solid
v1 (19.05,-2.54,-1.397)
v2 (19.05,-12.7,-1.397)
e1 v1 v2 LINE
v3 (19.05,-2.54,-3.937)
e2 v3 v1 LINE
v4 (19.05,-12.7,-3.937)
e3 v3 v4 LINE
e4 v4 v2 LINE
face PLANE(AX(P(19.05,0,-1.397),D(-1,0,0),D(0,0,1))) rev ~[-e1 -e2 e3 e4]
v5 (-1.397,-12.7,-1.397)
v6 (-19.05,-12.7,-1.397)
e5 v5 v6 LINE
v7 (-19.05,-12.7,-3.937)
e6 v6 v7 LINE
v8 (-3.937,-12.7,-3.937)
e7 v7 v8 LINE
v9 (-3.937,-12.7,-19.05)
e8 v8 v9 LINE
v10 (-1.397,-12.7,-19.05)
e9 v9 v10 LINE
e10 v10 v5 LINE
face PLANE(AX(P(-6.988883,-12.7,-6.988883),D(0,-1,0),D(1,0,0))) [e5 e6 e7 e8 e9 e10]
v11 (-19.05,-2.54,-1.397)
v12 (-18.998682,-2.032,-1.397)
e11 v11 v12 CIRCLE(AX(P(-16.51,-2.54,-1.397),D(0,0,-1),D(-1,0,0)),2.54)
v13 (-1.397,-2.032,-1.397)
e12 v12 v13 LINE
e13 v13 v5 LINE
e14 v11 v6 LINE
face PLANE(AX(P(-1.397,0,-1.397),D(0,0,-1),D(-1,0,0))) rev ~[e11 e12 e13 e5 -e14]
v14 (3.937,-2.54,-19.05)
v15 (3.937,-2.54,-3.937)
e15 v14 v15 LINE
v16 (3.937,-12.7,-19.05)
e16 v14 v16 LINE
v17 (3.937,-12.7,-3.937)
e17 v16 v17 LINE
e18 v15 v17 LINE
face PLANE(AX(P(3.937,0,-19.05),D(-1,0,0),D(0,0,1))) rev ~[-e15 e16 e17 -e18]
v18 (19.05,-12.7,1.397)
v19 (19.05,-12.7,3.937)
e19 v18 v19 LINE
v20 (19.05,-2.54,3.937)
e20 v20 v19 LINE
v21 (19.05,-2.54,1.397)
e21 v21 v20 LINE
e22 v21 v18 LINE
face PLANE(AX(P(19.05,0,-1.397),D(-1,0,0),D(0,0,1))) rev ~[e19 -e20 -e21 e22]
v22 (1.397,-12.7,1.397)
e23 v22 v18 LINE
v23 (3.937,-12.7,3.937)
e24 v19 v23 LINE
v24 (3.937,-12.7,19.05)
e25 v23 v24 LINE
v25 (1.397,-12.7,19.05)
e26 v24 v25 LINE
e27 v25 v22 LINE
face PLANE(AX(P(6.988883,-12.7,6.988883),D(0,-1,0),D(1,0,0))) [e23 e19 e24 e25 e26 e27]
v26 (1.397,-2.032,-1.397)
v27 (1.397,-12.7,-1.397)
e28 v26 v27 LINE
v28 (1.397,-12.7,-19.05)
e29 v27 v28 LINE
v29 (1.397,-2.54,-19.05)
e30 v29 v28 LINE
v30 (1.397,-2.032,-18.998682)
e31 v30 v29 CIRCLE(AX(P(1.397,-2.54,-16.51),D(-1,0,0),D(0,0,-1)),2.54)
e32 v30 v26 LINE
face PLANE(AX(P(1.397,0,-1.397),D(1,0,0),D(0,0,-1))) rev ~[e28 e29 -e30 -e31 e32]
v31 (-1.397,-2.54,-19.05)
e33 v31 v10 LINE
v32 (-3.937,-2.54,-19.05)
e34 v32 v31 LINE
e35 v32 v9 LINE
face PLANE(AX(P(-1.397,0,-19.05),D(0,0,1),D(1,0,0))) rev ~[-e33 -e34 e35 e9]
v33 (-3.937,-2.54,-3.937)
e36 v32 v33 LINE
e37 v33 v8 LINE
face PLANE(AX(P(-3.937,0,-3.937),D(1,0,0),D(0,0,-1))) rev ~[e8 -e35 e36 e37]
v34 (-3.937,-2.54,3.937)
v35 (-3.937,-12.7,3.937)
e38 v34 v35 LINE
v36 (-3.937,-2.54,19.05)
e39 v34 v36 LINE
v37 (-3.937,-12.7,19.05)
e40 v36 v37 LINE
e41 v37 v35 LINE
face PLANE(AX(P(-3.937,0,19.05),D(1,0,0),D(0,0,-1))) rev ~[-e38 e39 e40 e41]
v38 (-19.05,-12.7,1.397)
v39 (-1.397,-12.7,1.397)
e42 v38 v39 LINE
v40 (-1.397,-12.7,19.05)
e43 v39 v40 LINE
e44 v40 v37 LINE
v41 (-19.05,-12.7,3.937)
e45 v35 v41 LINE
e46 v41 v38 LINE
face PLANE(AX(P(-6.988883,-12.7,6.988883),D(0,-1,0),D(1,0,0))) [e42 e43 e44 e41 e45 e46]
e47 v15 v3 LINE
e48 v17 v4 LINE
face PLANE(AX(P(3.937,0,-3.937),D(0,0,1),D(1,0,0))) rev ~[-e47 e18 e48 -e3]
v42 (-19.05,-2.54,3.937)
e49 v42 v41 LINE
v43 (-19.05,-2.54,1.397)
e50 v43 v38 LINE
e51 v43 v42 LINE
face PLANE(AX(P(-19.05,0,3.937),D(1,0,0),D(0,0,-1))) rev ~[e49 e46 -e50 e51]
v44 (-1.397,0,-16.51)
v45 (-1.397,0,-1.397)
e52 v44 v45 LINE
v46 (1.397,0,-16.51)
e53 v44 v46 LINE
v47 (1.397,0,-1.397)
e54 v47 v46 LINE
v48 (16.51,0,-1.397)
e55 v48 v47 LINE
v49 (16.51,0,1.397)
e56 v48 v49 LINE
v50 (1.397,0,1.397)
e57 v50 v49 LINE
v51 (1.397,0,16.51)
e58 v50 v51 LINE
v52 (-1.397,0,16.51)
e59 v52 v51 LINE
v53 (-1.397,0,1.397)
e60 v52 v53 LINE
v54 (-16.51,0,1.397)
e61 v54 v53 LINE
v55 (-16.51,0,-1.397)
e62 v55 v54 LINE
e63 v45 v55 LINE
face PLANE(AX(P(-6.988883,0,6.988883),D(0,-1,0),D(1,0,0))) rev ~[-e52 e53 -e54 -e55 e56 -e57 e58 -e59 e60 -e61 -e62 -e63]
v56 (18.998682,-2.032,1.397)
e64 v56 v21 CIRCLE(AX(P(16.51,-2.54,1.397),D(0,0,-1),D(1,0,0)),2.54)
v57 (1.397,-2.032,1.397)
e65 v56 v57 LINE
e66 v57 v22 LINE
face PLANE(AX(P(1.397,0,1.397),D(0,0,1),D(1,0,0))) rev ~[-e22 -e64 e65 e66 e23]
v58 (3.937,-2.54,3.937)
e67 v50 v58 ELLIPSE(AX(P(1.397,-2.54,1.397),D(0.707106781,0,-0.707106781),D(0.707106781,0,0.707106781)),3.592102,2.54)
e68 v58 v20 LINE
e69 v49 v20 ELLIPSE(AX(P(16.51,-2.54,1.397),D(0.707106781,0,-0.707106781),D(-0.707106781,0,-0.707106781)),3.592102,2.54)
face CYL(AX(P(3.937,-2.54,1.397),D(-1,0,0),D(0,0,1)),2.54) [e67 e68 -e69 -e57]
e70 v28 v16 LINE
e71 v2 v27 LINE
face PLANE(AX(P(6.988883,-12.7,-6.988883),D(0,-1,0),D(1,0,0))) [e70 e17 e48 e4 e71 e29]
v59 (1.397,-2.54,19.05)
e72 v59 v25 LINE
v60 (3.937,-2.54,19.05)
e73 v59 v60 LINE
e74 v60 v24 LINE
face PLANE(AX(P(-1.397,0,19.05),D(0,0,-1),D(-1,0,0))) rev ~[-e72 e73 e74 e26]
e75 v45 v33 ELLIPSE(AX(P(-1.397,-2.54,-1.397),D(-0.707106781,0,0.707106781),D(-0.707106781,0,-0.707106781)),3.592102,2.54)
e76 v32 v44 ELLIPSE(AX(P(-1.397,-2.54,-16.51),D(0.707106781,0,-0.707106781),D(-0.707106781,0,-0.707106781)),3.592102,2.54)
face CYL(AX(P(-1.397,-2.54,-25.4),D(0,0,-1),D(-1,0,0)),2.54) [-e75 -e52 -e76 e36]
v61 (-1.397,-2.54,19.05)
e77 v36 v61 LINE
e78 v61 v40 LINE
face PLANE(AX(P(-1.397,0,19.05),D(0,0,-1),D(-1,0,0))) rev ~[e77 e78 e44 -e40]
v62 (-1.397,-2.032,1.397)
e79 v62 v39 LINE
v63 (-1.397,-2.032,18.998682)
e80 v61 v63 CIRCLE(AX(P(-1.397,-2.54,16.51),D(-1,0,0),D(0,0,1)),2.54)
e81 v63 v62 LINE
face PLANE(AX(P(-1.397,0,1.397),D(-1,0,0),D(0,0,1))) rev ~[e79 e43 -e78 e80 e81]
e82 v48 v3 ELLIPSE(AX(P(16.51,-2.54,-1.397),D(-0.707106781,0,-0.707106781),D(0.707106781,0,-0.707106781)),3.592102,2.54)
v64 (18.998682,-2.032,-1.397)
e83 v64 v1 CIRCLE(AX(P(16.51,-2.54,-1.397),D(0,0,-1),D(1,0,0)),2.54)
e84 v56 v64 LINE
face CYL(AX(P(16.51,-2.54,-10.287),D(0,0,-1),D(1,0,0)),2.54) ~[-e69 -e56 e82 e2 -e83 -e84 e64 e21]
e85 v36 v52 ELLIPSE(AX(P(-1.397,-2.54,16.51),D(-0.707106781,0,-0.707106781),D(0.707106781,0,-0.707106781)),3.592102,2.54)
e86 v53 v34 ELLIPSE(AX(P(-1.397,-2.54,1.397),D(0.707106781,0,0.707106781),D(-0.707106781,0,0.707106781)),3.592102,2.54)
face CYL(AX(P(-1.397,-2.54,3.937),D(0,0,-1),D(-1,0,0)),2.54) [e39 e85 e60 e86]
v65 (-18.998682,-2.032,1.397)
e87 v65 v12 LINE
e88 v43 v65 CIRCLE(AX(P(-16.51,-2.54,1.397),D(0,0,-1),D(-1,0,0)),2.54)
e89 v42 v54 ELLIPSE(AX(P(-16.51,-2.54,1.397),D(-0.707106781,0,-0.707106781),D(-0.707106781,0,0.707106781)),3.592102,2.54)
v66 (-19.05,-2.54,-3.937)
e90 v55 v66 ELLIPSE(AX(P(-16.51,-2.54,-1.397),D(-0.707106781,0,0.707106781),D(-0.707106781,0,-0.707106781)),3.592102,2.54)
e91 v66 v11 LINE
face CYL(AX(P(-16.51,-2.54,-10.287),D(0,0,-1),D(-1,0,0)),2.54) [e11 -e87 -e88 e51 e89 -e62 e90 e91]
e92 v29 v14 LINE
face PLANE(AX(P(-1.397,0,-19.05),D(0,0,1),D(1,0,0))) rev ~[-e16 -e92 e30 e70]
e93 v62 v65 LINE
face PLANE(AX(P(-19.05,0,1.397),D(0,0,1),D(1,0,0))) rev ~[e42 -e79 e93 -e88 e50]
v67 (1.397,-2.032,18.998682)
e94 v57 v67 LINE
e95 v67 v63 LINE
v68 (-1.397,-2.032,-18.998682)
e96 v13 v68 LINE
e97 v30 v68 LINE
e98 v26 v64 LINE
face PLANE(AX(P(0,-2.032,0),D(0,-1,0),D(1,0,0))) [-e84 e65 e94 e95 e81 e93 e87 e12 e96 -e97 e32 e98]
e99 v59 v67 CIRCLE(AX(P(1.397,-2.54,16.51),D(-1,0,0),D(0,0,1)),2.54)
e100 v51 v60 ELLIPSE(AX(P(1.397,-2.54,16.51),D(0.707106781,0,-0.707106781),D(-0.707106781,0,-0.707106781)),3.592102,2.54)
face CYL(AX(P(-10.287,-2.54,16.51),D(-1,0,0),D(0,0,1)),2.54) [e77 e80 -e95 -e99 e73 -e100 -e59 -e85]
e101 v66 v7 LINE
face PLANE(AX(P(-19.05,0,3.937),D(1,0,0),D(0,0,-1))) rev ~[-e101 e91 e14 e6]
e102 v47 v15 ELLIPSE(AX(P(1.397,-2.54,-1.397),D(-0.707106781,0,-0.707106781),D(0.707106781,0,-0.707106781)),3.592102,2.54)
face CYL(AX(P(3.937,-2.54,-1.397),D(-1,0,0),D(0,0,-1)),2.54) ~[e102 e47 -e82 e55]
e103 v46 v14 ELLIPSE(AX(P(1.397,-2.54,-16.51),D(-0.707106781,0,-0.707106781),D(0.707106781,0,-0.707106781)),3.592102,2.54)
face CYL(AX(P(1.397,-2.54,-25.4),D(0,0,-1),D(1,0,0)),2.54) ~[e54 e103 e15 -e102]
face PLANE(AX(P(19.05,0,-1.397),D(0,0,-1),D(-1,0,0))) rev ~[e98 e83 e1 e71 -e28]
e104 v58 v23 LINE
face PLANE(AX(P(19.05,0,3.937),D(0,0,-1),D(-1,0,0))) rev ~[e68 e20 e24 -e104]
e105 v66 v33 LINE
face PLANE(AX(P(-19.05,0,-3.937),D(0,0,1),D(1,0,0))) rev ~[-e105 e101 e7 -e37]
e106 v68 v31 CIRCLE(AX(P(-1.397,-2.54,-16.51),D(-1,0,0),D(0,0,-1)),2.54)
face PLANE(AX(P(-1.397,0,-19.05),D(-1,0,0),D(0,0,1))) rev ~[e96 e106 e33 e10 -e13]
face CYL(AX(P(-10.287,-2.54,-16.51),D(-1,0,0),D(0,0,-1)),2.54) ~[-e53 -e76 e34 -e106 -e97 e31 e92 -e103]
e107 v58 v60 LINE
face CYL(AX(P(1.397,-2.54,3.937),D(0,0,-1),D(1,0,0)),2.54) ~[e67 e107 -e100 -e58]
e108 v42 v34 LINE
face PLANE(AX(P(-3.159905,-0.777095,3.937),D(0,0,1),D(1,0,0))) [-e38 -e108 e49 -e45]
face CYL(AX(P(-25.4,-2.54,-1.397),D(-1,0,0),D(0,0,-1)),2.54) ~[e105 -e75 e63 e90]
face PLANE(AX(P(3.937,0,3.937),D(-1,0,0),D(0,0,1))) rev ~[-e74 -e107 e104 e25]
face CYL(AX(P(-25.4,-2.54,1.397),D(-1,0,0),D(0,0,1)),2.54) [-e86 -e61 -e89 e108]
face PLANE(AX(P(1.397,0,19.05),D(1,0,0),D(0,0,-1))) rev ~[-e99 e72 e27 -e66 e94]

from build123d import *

# Parameters (mm, degrees)
F1_DEPTH     = 2.032
F2_DEPTH     = 12.7
F3_T1_DEPTH  = 21.463
F3_T3_DEPTH  = 21.463
F3_T5_DEPTH  = 20.574
F3_T7_DEPTH  = 21.463
F3_T9_DEPTH  = 20.574
F3_T11_DEPTH = 21.463
F3_T17_DEPTH = 27.813
F3_T21_DEPTH = 27.813
F3_T28_DEPTH = 27.813
F3_T32_DEPTH = 27.813
F3_T39_DEPTH = 27.813
F3_T43_DEPTH = 27.813
F3_T50_DEPTH = 27.813
F3_T54_DEPTH = 27.813


# Not quite as in the source:
# - a fillet or chamfer that OpenCascade refuses, or shapes differently, is made with other operations: its cross-section is extruded or revolved along the edge and cut away or added


with BuildPart() as f1:
    # F0 (on Front) → F1 (new body)
    with BuildSketch(Plane.XZ):
        Polygon((1.397, 19.05), (-1.397, 19.05), (-1.397, 1.397), (-19.05, 1.397), (-19.05, -1.397), (-1.397, -1.397), (-1.397, -19.05), (1.397, -19.05), (1.397, -1.397), (19.05, -1.397), (19.05, 1.397), (1.397, 1.397), align=None)
    extrude(amount=F1_DEPTH)

    # F0 (on Front) → F2 (join)
    with BuildSketch(Plane.XZ):
        Polygon((-1.397, 19.05), (-3.937, 19.05), (-3.937, 3.937), (-19.05, 3.937), (-19.05, 1.397), (-1.397, 1.397), align=None)
        Polygon((3.937, 19.05), (1.397, 19.05), (1.397, 1.397), (19.05, 1.397), (19.05, 3.937), (3.937, 3.937), align=None)
        Polygon((-1.397, -1.397), (-19.05, -1.397), (-19.05, -3.937), (-3.937, -3.937), (-3.937, -19.05), (-1.397, -19.05), align=None)
        Polygon((19.05, -3.937), (19.05, -1.397), (1.397, -1.397), (1.397, -19.05), (3.937, -19.05), (3.937, -3.937), align=None)
    extrude(amount=F2_DEPTH)

    # F3: fillet of radius 2.54 on 12 edges, made by hand

    # F3_s2 → F3_t1 (cut)
    with BuildSketch(Plane.XY.offset(3.937)):
        with BuildLine():
            ThreePointArc((-3.937, -2.54), (-3.1930512242, -0.7439487758), (-1.397, 0))
            Line((-1.397, 0), (-3.937, 0))
            Line((-3.937, 0), (-3.937, -2.54))
        make_face()
        with BuildLine():
            ThreePointArc((3.937, -2.54), (3.1930512242, -0.7439487758), (1.397, 0))
            Line((1.397, 0), (3.937, 0))
            Line((3.937, 0), (3.937, -2.54))
        make_face()
    extrude(amount=F3_T1_DEPTH, mode=Mode.SUBTRACT)

    # F3_s4 → F3_t3 (cut)
    with BuildSketch(Plane.YZ.offset(-25.4)):
        with BuildLine():
            ThreePointArc((-2.54, 3.937), (-0.7439487758, 3.1930512242), (0, 1.397))
            Line((0, 1.397), (0, 3.937))
            Line((0, 3.937), (-2.54, 3.937))
        make_face()
        with BuildLine():
            ThreePointArc((-2.54, -3.937), (-0.7439487758, -3.1930512242), (0, -1.397))
            Line((0, -1.397), (0, -3.937))
            Line((0, -3.937), (-2.54, -3.937))
        make_face()
    extrude(amount=F3_T3_DEPTH, mode=Mode.SUBTRACT)

    # F3_s6 → F3_t5 (cut)
    with BuildSketch(Plane.XY.offset(-10.287)):
        with BuildLine():
            ThreePointArc((-19.05, -2.54), (-18.3060512242, -0.7439487758), (-16.51, 0))
            Line((-16.51, 0), (-19.05, 0))
            Line((-19.05, 0), (-19.05, -2.54))
        make_face()
        with BuildLine():
            ThreePointArc((19.05, -2.54), (18.3060512242, -0.7439487758), (16.51, 0))
            Line((16.51, 0), (19.05, 0))
            Line((19.05, 0), (19.05, -2.54))
        make_face()
    extrude(amount=F3_T5_DEPTH, mode=Mode.SUBTRACT)

    # F3_s8 → F3_t7 (cut)
    with BuildSketch(Plane.XY.offset(-25.4)):
        with BuildLine():
            ThreePointArc((-3.937, -2.54), (-3.1930512242, -0.7439487758), (-1.397, 0))
            Line((-1.397, 0), (-3.937, 0))
            Line((-3.937, 0), (-3.937, -2.54))
        make_face()
        with BuildLine():
            ThreePointArc((3.937, -2.54), (3.1930512242, -0.7439487758), (1.397, 0))
            Line((1.397, 0), (3.937, 0))
            Line((3.937, 0), (3.937, -2.54))
        make_face()
    extrude(amount=F3_T7_DEPTH, mode=Mode.SUBTRACT)

    # F3_s10 → F3_t9 (cut)
    with BuildSketch(Plane.YZ.offset(-10.287)):
        with BuildLine():
            ThreePointArc((-2.54, -19.05), (-0.7439487758, -18.3060512242), (0, -16.51))
            Line((0, -16.51), (0, -19.05))
            Line((0, -19.05), (-2.54, -19.05))
        make_face()
        with BuildLine():
            ThreePointArc((-2.54, 19.05), (-0.7439487758, 18.3060512242), (0, 16.51))
            Line((0, 16.51), (0, 19.05))
            Line((0, 19.05), (-2.54, 19.05))
        make_face()
    extrude(amount=F3_T9_DEPTH, mode=Mode.SUBTRACT)

    # F3_s12 → F3_t11 (cut)
    with BuildSketch(Plane.YZ.offset(3.937)):
        with BuildLine():
            ThreePointArc((-2.54, -3.937), (-0.7439487758, -3.1930512242), (0, -1.397))
            Line((0, -1.397), (0, -3.937))
            Line((0, -3.937), (-2.54, -3.937))
        make_face()
        with BuildLine():
            ThreePointArc((-2.54, 3.937), (-0.7439487758, 3.1930512242), (0, 1.397))
            Line((0, 1.397), (0, 3.937))
            Line((0, 3.937), (-2.54, 3.937))
        make_face()
    extrude(amount=F3_T11_DEPTH, mode=Mode.SUBTRACT)


with BuildPart() as f3_tool15:
    # F3_s16 → F3_t17 (new body)
    with BuildSketch(Plane.XY.offset(25.4)):
        with BuildLine():
            ThreePointArc((-3.937, -2.54), (-3.1930512242, -0.7439487758), (-1.397, 0))
            Line((-1.397, 0), (-3.937, 0))
            Line((-3.937, 0), (-3.937, -2.54))
        make_face()
    extrude(amount=-F3_T17_DEPTH)

    split(bisect_by=Plane.XY.offset(3.937), keep=Keep.BOTTOM)


with BuildPart() as f3_tool19:
    # F3_s20 → F3_t21 (new body)
    with BuildSketch(Plane.YZ.offset(2.413)):
        with BuildLine():
            ThreePointArc((-2.54, 3.937), (-0.7439487758, 3.1930512242), (0, 1.397))
            Line((0, 1.397), (0, 3.937))
            Line((0, 3.937), (-2.54, 3.937))
        make_face()
    extrude(amount=-F3_T21_DEPTH)

    split(bisect_by=Plane.YZ.offset(-3.937), keep=Keep.TOP)


with BuildPart() as f3_tool15_1:
    add(f3_tool15.part)

    # F3_t23: intersect F3_tool19
    add(f3_tool19.part, mode=Mode.INTERSECT)


with BuildPart() as f1_1:
    add(f1.part)

    # F3_t13: cut F3_tool15
    add(f3_tool15_1.part, mode=Mode.SUBTRACT)


with BuildPart() as f3_tool26:
    # F3_s27 → F3_t28 (new body)
    with BuildSketch(Plane.YZ.offset(-25.4)):
        with BuildLine():
            ThreePointArc((-2.54, -3.937), (-0.7439487758, -3.1930512242), (0, -1.397))
            Line((0, -1.397), (0, -3.937))
            Line((0, -3.937), (-2.54, -3.937))
        make_face()
    extrude(amount=F3_T28_DEPTH)

    split(bisect_by=Plane.YZ.offset(-3.937), keep=Keep.TOP)


with BuildPart() as f3_tool30:
    # F3_s31 → F3_t32 (new body)
    with BuildSketch(Plane.XY.offset(2.413)):
        with BuildLine():
            ThreePointArc((-3.937, -2.54), (-3.1930512242, -0.7439487758), (-1.397, 0))
            Line((-1.397, 0), (-3.937, 0))
            Line((-3.937, 0), (-3.937, -2.54))
        make_face()
    extrude(amount=-F3_T32_DEPTH)

    split(bisect_by=Plane.XY.offset(-3.937), keep=Keep.TOP)


with BuildPart() as f3_tool26_1:
    add(f3_tool26.part)

    # F3_t34: intersect F3_tool30
    add(f3_tool30.part, mode=Mode.INTERSECT)


with BuildPart() as f1_2:
    add(f1_1.part)

    # F3_t24: cut F3_tool26
    add(f3_tool26_1.part, mode=Mode.SUBTRACT)


with BuildPart() as f3_tool37:
    # F3_s38 → F3_t39 (new body)
    with BuildSketch(Plane.XY.offset(-25.4)):
        with BuildLine():
            ThreePointArc((3.937, -2.54), (3.1930512242, -0.7439487758), (1.397, 0))
            Line((1.397, 0), (3.937, 0))
            Line((3.937, 0), (3.937, -2.54))
        make_face()
    extrude(amount=F3_T39_DEPTH)

    split(bisect_by=Plane.XY.offset(-3.937), keep=Keep.TOP)


with BuildPart() as f3_tool41:
    # F3_s42 → F3_t43 (new body)
    with BuildSketch(Plane.YZ.offset(-2.413)):
        with BuildLine():
            ThreePointArc((-2.54, -3.937), (-0.7439487758, -3.1930512242), (0, -1.397))
            Line((0, -1.397), (0, -3.937))
            Line((0, -3.937), (-2.54, -3.937))
        make_face()
    extrude(amount=F3_T43_DEPTH)

    split(bisect_by=Plane.YZ.offset(3.937), keep=Keep.BOTTOM)


with BuildPart() as f3_tool37_1:
    add(f3_tool37.part)

    # F3_t45: intersect F3_tool41
    add(f3_tool41.part, mode=Mode.INTERSECT)


with BuildPart() as f1_3:
    add(f1_2.part)

    # F3_t35: cut F3_tool37
    add(f3_tool37_1.part, mode=Mode.SUBTRACT)


with BuildPart() as f3_tool48:
    # F3_s49 → F3_t50 (new body)
    with BuildSketch(Plane.YZ.offset(25.4)):
        with BuildLine():
            ThreePointArc((-2.54, 3.937), (-0.7439487758, 3.1930512242), (0, 1.397))
            Line((0, 1.397), (0, 3.937))
            Line((0, 3.937), (-2.54, 3.937))
        make_face()
    extrude(amount=-F3_T50_DEPTH)

    split(bisect_by=Plane.YZ.offset(3.937), keep=Keep.BOTTOM)


with BuildPart() as f3_tool52:
    # F3_s53 → F3_t54 (new body)
    with BuildSketch(Plane.XY.offset(-2.413)):
        with BuildLine():
            ThreePointArc((3.937, -2.54), (3.1930512242, -0.7439487758), (1.397, 0))
            Line((1.397, 0), (3.937, 0))
            Line((3.937, 0), (3.937, -2.54))
        make_face()
    extrude(amount=F3_T54_DEPTH)

    split(bisect_by=Plane.XY.offset(3.937), keep=Keep.BOTTOM)


with BuildPart() as f3_tool48_1:
    add(f3_tool48.part)

    # F3_t56: intersect F3_tool52
    add(f3_tool52.part, mode=Mode.INTERSECT)


with BuildPart() as f1_4:
    add(f1_3.part)

    # F3_t46: cut F3_tool48
    add(f3_tool48_1.part, mode=Mode.SUBTRACT)


solid = f1_4.part
